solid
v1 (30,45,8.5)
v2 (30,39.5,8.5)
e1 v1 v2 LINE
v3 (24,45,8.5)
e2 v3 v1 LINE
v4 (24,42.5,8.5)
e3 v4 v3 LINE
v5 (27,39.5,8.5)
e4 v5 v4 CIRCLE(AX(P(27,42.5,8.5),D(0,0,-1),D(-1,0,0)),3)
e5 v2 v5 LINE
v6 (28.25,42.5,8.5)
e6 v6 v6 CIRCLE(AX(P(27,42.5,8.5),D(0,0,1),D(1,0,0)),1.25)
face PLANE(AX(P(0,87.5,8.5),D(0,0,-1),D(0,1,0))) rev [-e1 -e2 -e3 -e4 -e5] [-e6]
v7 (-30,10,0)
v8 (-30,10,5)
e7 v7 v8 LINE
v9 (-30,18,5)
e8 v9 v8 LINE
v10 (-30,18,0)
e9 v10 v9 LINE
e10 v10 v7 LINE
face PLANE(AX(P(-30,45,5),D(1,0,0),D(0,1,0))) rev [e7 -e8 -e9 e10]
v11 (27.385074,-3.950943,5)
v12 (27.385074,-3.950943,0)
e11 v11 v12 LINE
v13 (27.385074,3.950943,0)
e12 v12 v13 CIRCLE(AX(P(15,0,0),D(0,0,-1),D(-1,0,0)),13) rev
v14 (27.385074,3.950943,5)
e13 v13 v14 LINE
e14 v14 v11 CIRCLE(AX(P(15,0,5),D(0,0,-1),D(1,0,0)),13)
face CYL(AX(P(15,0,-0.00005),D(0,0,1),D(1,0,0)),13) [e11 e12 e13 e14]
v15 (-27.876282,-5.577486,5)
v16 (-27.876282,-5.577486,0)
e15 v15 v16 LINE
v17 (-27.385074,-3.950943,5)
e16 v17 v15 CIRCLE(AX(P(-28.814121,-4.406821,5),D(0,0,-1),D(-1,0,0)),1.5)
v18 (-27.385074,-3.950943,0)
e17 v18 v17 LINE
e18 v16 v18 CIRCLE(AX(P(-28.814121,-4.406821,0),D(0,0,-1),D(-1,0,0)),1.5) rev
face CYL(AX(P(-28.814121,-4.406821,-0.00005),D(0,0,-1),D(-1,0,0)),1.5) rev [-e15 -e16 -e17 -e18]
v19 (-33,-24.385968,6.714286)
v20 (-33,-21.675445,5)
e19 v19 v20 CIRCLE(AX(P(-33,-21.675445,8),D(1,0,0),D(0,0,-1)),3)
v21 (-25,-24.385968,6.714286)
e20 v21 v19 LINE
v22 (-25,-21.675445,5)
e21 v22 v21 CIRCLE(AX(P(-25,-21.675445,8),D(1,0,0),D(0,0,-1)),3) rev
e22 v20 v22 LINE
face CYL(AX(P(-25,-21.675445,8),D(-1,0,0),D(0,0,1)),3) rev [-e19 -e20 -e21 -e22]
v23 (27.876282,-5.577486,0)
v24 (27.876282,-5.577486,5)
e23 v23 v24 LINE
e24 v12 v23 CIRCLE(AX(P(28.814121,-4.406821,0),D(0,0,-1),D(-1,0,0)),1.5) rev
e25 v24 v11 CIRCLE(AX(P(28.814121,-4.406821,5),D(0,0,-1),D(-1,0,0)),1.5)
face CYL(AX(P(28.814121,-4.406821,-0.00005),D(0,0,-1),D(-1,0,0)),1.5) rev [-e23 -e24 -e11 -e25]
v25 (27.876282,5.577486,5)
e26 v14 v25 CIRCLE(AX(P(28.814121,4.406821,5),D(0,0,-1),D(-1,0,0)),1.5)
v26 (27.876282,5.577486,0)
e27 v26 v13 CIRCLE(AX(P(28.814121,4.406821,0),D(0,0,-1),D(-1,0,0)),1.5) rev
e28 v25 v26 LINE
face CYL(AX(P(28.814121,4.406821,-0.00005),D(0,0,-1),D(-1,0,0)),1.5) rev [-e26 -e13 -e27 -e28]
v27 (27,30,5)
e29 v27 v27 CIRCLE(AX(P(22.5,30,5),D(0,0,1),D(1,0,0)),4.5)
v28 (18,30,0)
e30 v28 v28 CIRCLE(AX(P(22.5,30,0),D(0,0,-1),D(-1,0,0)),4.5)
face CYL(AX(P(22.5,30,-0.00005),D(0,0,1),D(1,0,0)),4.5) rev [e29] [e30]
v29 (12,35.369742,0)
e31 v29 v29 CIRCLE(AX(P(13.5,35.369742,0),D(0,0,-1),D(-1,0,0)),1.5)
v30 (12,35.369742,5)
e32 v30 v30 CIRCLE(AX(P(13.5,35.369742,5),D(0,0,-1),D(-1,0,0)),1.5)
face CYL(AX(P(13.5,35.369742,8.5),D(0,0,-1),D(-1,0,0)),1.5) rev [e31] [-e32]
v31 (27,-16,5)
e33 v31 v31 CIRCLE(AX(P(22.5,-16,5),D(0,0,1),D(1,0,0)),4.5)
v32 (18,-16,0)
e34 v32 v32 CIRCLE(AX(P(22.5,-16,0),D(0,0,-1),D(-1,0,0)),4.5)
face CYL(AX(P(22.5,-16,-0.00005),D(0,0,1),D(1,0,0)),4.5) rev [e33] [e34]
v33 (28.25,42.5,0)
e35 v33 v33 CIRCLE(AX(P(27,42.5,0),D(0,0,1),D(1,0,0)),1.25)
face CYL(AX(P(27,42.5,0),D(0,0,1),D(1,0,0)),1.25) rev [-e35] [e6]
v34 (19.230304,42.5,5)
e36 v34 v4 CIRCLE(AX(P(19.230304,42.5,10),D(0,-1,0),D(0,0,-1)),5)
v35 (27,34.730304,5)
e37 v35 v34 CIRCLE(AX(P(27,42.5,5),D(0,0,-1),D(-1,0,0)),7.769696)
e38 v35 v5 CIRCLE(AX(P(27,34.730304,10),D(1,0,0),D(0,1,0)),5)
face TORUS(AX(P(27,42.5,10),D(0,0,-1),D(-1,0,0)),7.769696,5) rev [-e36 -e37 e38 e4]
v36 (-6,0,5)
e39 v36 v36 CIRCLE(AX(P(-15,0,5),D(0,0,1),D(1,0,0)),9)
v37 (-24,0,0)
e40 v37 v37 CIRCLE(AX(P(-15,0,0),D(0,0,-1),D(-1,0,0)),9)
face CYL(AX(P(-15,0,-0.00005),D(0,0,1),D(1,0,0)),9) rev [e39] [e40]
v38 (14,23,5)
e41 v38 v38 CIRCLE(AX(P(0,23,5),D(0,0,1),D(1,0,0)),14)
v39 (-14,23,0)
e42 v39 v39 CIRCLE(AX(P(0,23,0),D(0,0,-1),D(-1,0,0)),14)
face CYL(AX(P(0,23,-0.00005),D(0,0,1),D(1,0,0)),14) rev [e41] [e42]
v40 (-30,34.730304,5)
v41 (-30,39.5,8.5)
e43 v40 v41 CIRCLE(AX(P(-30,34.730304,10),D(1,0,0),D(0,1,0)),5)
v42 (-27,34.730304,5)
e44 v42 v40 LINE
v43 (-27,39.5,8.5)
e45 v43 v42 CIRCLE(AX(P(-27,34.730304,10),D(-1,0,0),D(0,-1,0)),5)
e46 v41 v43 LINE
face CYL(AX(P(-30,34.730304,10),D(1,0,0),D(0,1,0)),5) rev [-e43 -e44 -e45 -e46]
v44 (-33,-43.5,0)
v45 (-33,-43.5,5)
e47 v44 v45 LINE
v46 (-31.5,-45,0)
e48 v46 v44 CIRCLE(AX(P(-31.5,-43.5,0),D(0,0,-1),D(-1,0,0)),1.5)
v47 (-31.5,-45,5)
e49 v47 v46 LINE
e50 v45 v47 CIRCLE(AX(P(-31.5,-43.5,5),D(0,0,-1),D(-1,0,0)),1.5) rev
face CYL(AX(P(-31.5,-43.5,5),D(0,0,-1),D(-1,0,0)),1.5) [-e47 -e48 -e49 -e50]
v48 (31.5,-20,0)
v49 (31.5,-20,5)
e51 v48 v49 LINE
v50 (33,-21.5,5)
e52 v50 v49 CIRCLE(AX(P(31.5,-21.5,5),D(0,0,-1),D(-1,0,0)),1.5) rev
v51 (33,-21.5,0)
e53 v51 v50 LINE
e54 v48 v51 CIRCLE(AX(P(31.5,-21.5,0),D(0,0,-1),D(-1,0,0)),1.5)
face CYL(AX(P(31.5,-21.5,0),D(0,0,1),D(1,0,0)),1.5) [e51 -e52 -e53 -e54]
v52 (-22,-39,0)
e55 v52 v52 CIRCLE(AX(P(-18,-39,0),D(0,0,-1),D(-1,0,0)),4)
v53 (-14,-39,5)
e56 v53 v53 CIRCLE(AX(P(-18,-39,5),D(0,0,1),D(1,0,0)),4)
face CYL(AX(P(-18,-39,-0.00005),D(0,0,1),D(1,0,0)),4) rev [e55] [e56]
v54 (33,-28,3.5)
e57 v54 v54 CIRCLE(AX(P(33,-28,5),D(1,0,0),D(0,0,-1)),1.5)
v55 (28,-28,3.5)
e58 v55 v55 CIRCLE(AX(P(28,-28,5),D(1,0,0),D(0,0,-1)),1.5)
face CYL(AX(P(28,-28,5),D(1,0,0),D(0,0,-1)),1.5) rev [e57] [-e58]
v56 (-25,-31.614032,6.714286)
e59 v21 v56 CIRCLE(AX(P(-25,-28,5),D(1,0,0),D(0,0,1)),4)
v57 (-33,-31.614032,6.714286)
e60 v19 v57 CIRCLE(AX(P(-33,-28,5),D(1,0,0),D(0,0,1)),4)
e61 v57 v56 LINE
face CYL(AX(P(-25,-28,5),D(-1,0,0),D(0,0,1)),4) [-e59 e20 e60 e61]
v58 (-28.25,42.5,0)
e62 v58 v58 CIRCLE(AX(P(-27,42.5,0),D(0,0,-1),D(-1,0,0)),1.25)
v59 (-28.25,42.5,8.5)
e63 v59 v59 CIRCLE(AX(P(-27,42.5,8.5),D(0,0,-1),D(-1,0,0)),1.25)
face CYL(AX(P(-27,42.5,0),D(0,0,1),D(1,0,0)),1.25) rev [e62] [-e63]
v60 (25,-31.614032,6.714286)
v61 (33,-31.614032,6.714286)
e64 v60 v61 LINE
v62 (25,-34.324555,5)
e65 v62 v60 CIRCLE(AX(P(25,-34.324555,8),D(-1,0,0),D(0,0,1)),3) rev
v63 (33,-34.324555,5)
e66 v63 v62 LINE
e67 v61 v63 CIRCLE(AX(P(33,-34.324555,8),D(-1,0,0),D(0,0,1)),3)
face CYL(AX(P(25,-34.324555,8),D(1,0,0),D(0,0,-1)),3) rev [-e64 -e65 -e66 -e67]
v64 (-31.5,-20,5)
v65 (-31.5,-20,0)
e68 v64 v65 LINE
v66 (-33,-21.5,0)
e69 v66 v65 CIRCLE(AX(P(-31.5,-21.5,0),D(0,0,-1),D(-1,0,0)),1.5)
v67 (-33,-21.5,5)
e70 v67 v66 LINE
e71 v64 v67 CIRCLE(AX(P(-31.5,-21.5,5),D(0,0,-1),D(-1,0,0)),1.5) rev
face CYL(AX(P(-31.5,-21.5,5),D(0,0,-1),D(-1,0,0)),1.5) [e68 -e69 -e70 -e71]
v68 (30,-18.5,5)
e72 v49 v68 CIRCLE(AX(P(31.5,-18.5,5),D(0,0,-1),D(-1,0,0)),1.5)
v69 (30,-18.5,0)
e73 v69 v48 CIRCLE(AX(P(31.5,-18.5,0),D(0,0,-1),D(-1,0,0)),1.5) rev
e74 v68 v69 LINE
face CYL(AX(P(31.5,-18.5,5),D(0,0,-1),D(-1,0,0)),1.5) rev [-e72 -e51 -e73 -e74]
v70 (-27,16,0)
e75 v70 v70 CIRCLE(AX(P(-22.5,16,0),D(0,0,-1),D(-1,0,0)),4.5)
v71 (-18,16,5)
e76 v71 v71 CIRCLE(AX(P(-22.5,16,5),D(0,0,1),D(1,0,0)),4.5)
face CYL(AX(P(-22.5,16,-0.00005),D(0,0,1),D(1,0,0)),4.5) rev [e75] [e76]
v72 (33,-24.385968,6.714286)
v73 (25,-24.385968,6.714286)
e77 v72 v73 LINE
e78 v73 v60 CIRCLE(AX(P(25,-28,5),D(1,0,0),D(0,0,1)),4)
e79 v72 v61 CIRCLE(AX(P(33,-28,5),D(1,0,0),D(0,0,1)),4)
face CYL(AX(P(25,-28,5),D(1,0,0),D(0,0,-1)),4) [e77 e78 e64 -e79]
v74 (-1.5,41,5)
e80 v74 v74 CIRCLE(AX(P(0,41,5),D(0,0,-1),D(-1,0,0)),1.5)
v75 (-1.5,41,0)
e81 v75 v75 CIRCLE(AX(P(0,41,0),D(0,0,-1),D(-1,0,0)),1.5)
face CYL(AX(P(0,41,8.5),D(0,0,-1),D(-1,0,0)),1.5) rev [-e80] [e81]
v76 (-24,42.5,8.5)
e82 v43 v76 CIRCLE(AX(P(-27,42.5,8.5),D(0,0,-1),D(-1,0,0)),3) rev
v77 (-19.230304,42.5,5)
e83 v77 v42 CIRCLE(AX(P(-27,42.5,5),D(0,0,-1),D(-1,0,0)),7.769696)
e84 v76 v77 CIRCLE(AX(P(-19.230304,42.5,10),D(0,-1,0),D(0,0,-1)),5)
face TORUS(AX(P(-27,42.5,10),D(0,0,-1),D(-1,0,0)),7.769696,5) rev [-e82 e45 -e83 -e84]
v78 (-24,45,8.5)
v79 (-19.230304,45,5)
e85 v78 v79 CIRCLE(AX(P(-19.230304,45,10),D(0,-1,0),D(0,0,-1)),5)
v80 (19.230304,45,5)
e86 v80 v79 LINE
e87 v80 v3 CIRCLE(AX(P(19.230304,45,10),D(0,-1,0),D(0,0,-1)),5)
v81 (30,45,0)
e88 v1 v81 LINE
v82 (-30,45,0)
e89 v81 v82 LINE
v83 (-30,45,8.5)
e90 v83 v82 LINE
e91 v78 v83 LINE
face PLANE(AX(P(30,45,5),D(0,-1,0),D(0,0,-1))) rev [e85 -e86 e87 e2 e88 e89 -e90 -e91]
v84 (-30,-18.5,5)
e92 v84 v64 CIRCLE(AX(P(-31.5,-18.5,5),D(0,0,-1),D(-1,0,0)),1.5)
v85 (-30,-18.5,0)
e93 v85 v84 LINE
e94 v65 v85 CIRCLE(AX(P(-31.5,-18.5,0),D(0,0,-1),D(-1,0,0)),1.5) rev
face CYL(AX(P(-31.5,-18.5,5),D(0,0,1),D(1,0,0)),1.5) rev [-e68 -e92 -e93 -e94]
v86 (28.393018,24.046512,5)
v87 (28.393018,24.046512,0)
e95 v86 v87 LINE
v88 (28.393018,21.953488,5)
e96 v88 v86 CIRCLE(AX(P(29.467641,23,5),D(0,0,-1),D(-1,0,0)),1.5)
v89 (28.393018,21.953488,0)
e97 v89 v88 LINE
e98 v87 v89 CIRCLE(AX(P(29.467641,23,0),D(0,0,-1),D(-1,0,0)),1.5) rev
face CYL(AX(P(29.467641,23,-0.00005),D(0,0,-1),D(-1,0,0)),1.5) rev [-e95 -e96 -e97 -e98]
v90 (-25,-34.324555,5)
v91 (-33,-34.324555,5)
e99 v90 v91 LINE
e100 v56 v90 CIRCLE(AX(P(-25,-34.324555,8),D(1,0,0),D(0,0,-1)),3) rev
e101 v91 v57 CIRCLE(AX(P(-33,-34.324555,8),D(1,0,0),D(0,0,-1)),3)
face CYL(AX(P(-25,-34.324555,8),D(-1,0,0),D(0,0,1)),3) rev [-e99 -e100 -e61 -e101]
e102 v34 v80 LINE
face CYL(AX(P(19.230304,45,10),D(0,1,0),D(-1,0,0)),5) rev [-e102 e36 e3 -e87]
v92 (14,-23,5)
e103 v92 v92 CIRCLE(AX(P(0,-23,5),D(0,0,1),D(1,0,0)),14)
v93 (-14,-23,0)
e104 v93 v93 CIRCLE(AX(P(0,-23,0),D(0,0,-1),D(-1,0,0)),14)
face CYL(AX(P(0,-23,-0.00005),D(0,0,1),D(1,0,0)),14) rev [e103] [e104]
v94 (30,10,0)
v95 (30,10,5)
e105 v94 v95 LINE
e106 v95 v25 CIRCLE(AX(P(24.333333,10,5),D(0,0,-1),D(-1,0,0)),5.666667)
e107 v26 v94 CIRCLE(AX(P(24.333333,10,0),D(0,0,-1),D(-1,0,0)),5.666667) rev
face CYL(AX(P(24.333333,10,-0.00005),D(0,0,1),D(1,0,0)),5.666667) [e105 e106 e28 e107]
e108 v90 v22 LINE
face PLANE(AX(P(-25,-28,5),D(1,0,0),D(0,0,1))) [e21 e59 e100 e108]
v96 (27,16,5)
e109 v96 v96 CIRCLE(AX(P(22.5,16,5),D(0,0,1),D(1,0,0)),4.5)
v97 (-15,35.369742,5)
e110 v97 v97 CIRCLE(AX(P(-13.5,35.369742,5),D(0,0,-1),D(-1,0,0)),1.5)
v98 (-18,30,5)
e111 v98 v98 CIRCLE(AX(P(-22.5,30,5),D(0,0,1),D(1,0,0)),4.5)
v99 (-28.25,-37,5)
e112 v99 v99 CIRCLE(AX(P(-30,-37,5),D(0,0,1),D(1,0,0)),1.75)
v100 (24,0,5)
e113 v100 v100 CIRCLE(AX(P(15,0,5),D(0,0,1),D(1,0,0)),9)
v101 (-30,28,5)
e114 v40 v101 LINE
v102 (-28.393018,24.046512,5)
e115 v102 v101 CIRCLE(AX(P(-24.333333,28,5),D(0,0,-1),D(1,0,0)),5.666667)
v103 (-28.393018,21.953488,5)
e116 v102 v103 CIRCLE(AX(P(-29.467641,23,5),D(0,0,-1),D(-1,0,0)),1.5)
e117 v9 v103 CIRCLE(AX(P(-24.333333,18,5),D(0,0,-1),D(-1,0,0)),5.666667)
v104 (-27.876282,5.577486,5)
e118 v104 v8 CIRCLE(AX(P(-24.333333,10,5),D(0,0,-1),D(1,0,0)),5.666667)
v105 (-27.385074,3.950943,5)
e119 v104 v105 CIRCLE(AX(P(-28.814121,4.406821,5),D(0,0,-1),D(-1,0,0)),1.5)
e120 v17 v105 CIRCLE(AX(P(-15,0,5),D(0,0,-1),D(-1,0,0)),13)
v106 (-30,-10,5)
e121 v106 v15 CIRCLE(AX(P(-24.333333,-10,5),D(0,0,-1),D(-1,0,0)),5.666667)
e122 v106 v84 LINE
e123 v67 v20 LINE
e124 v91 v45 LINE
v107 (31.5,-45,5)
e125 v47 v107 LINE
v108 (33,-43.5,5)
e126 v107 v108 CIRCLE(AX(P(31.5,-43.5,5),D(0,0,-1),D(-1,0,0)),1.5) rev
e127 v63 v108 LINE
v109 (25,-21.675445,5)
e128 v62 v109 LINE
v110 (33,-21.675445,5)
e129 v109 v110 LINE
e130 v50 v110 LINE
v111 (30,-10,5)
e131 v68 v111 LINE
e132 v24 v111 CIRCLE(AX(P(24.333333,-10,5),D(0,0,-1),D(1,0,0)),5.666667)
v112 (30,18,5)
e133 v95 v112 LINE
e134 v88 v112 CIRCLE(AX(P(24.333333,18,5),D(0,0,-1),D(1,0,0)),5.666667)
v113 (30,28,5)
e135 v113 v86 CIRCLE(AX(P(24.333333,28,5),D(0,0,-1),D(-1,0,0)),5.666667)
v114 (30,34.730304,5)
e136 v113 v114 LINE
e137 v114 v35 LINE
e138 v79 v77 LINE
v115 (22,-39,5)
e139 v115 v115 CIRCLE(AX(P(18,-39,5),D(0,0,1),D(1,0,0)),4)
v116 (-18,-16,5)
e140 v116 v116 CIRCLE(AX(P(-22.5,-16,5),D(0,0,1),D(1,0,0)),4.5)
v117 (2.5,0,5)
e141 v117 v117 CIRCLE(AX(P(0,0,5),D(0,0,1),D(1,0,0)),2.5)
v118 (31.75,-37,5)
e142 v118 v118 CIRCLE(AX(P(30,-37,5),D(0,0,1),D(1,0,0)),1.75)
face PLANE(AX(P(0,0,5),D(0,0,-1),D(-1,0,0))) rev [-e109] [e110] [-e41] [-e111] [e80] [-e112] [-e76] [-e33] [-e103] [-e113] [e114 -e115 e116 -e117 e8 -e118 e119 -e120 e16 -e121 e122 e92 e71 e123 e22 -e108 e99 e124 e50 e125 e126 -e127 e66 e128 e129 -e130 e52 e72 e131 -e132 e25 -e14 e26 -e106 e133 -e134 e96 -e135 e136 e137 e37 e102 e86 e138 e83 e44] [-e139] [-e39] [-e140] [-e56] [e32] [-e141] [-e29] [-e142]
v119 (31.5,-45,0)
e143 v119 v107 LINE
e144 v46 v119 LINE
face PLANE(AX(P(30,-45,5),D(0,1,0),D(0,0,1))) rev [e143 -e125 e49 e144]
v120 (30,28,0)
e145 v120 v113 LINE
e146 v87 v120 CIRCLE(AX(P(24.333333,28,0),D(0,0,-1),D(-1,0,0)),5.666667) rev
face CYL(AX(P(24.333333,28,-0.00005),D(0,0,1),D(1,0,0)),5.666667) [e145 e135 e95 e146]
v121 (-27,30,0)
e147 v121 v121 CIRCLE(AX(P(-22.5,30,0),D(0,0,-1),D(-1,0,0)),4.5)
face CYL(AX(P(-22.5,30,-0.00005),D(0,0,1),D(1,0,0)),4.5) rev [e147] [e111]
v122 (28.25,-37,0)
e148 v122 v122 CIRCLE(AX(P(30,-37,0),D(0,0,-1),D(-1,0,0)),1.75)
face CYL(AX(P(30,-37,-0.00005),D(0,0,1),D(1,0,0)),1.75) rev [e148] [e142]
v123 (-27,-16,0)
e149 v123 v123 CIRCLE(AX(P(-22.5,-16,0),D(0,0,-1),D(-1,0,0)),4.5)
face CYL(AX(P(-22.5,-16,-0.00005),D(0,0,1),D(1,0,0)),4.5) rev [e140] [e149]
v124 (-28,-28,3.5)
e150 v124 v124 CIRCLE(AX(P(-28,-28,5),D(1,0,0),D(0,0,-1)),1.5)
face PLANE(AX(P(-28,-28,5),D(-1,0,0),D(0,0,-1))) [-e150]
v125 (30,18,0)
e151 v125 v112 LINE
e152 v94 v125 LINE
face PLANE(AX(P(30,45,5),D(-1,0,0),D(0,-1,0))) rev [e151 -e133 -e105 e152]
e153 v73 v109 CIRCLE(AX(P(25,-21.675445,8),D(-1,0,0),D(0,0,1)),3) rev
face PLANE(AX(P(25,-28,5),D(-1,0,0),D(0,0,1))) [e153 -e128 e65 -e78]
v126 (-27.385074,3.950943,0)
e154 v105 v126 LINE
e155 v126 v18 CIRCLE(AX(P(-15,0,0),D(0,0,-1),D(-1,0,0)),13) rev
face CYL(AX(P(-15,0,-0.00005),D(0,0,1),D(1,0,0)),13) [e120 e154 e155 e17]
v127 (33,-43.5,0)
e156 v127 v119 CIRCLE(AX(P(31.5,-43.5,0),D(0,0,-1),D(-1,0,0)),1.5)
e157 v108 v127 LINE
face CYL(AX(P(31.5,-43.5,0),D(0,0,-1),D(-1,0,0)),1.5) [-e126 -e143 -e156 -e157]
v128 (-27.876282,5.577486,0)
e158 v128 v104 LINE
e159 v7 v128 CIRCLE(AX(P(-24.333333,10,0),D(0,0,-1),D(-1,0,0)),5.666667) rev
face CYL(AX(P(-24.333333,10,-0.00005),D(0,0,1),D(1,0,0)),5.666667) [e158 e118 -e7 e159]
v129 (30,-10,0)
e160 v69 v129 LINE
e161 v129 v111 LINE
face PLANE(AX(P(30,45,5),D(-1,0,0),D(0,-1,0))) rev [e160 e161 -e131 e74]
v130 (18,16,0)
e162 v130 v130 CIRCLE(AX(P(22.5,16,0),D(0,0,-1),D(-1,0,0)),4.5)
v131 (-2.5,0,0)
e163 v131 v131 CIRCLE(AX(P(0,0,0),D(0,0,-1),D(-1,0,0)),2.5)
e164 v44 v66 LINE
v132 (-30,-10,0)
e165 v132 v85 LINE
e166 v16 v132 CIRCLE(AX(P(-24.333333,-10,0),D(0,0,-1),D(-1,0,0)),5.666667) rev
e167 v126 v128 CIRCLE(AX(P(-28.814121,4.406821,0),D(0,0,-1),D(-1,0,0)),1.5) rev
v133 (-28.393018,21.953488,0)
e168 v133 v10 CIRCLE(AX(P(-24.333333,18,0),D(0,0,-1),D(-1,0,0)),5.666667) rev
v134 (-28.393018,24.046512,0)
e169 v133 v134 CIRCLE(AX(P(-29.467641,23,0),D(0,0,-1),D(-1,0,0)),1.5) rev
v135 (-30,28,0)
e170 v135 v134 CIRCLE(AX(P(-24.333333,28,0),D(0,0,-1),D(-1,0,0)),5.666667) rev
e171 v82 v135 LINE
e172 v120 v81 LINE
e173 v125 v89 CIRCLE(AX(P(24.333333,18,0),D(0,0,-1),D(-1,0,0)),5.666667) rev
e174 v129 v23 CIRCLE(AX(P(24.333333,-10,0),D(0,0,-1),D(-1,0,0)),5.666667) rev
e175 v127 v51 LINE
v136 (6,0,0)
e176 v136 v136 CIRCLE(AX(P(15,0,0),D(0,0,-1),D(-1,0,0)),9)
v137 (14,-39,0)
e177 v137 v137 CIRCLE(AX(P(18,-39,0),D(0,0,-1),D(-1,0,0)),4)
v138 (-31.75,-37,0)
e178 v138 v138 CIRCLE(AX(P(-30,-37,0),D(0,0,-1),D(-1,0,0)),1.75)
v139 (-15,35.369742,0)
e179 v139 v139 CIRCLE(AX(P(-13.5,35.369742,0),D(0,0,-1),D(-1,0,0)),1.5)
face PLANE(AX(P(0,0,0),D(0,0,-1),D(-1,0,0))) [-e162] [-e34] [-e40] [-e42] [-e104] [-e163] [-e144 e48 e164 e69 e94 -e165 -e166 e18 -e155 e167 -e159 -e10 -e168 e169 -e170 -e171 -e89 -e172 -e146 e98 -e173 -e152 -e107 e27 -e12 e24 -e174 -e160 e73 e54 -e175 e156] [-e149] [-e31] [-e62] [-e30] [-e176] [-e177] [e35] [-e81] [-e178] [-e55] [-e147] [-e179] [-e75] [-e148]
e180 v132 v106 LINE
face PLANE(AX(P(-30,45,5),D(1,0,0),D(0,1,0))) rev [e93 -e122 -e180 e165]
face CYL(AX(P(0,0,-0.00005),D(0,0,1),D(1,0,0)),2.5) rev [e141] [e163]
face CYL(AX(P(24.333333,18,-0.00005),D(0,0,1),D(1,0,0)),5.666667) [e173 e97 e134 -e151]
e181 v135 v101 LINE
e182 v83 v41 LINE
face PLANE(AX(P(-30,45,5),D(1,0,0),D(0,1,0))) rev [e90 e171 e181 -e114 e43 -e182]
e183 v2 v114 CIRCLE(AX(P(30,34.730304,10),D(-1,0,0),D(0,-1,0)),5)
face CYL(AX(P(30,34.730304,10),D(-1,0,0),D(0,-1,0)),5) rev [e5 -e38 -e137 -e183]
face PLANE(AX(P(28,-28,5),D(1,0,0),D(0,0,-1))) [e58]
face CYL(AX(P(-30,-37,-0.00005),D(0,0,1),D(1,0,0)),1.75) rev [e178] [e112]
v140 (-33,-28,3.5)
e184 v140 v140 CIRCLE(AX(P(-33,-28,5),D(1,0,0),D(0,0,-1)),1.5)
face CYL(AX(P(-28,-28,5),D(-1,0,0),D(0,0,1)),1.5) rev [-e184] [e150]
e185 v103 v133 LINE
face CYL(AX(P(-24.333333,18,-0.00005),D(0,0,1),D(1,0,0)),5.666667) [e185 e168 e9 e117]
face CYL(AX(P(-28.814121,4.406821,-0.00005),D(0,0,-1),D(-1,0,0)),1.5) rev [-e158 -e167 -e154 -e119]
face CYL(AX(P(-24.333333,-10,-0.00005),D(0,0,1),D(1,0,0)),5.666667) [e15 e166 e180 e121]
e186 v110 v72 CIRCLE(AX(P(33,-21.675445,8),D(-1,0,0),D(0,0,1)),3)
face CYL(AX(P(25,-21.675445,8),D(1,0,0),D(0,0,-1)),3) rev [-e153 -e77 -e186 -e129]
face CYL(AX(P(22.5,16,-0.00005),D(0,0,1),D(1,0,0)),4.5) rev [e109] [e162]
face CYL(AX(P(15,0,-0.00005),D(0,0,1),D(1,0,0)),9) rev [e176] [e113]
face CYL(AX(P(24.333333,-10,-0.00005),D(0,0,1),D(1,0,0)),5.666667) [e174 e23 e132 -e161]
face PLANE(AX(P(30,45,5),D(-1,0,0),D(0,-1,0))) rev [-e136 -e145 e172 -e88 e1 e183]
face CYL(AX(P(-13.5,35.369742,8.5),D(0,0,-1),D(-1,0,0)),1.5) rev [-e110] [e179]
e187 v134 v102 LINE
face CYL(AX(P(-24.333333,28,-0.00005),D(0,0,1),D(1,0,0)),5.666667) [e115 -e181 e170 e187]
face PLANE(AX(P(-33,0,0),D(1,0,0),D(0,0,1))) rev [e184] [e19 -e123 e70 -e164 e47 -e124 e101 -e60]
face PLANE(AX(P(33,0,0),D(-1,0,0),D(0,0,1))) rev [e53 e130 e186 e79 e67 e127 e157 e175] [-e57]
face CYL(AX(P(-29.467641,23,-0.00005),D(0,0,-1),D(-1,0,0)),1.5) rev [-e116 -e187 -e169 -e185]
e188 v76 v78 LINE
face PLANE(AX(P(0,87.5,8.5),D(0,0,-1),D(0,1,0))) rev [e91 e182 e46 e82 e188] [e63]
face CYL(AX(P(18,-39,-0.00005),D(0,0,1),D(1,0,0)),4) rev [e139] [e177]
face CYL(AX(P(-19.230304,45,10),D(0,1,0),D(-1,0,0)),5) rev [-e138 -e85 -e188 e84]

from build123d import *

# Parameters (mm, degrees)
SKETCH1_W            = 60
SKETCH1_H            = 90
BOSS_EXTRUDE1_DEPTH  = 5
SKETCH2_W            = 5
SKETCH2_H            = 25
BOSS_EXTRUDE2_DEPTH  = 3
SKETCH3_R            = 14
SKETCH3_R_2          = 9
SKETCH3_R_3          = 4.5
SKETCH3_R_4          = 4
SKETCH3_R_5          = 2.5
CUT_EXTRUDE1_DEPTH   = 57.026779311
SKETCH4_R            = 1.75
CUT_EXTRUDE2_DEPTH   = 57.026779311
FILLET1_R            = 1.5
FILLET2_R            = 1.5
BOSS_EXTRUDE3_DEPTH  = 3.5
SKETCH6_R            = 1.25
CUT_EXTRUDE3_DEPTH   = 57.446877835
FILLET3_R            = 5
FILLET3_OF_MIRROR2_R = 5
SKETCH12_R           = 1.5
CUT_EXTRUDE7_DEPTH   = 57.44687782
BOSS_EXTRUDE5_DEPTH  = 8
FILLET5_R            = 3
SKETCH15_R           = 1.5
CUT_EXTRUDE8_DEPTH   = 5
FILLET5_OF_MIRROR3_R = 3


# Some blends are built 0.0001 mm under size
with BuildPart() as part:
    # Sketch1 → Boss-Extrude1 (new body)
    with BuildSketch(Plane.XY):
        Rectangle(SKETCH1_W, SKETCH1_H)
    extrude(amount=BOSS_EXTRUDE1_DEPTH)

    # Sketch2 → Boss-Extrude2 (add)
    with BuildSketch(Plane(origin=(30, 0, 0), x_dir=(0, 0, -1), z_dir=(1, 0, 0))):
        with Locations((-2.5, -32.5)):
            Rectangle(SKETCH2_W, SKETCH2_H)
    boss_extrude2 = extrude(amount=BOSS_EXTRUDE2_DEPTH)

    # Mirror1: Boss-Extrude2 across plane
    add(boss_extrude2.mirror(Plane(origin=(0, 0, 0), x_dir=(0, 0, 1), z_dir=(1, 0, 0))))

    # Sketch3 → Cut-Extrude1 (cut, through all)
    with BuildSketch(Plane.XY.offset(5)):
        with Locations((0, -23)):
            Circle(SKETCH3_R)
        with Locations((0, 23)):
            Circle(SKETCH3_R)
        with Locations((15, 0)):
            Circle(SKETCH3_R_2)
        with Locations((-15, 0)):
            Circle(SKETCH3_R_2)
        with Locations((-22.5, -16)):
            Circle(SKETCH3_R_3)
        with Locations((-18, -39)):
            Circle(SKETCH3_R_4)
        with Locations((22.5, -16)):
            Circle(SKETCH3_R_3)
        with Locations((18, -39)):
            Circle(SKETCH3_R_4)
        with Locations((22.5, 16)):
            Circle(SKETCH3_R_3)
        with Locations((22.5, 30)):
            Circle(SKETCH3_R_3)
        with Locations((-22.5, 30)):
            Circle(SKETCH3_R_3)
        with Locations((-22.5, 16)):
            Circle(SKETCH3_R_3)
        Circle(SKETCH3_R_5)
        with BuildLine():
            Line((30, -10), (30, 10))
            ThreePointArc((30, 10), (29.192459912, 7.084524053), (27, 5))
            ThreePointArc((27, 5), (28, 0), (27, -5))
            ThreePointArc((27, -5), (29.192459912, -7.084524053), (30, -10))
        make_face()
        with BuildLine():
            Line((30, 18), (30, 28))
            ThreePointArc((30, 28), (29.192459912, 25.084524053), (27, 23))
            ThreePointArc((27, 23), (29.192459912, 20.915475947), (30, 18))
        make_face()
        with BuildLine():
            Line((-30, 18), (-30, 28))
            ThreePointArc((-30, 28), (-29.192459912, 25.084524053), (-27, 23))
            ThreePointArc((-27, 23), (-29.192459912, 20.915475947), (-30, 18))
        make_face()
        with BuildLine():
            Line((-30, -10), (-30, 10))
            ThreePointArc((-30, 10), (-29.192459912, 7.084524053), (-27, 5))
            ThreePointArc((-27, 5), (-28, 0), (-27, -5))
            ThreePointArc((-27, -5), (-29.192459912, -7.084524053), (-30, -10))
        make_face()
    extrude(amount=-CUT_EXTRUDE1_DEPTH, mode=Mode.SUBTRACT)

    # Sketch4 → Cut-Extrude2 (cut, through all)
    with BuildSketch(Plane.XY.offset(5)):
        with Locations((-30, -37)):
            Circle(SKETCH4_R)
        with Locations((30, -37)):
            Circle(SKETCH4_R)
    extrude(amount=-CUT_EXTRUDE2_DEPTH, mode=Mode.SUBTRACT)

    # Fillet1
    fillet1_edges = [part.edges().sort_by_distance(p)[0] for p in [
        (-33, -20, 2.5),
        (-33, -45, 2.5),
        (-30, -20, 2.5),
        (33, -45, 2.5),
        (33, -20, 2.5),
        (30, -20, 2.5),
    ]]
    fillet(fillet1_edges, radius=FILLET1_R - 0.0001)  # a hair under: the kernel refuses the full size

    # Fillet2
    fillet2_edges = [part.edges().sort_by_distance(p)[0] for p in [
        (27, -5, 2.5),
        (27, 5, 2.5),
        (27, 23, 2.5),
        (-27, 23, 2.5),
        (-27, -5, 2.5),
        (-27, 5, 2.5),
    ]]
    fillet(fillet2_edges, radius=FILLET2_R)

    # Sketch5 → Boss-Extrude3 (add)
    with BuildSketch(Plane.XY.offset(5)):
        with BuildLine():
            Line((24, 45), (30, 45))
            Line((30, 45), (30, 39.5))
            Line((30, 39.5), (27, 39.5))
            ThreePointArc((27, 39.5), (24.878679656, 40.378679656), (24, 42.5))
            Line((24, 42.5), (24, 45))
        make_face()
    boss_extrude3 = extrude(amount=BOSS_EXTRUDE3_DEPTH)

    # Sketch6 → Cut-Extrude3 (cut, through all)
    with BuildSketch(Plane.XY.offset(8.5)):
        with Locations((27, 42.5)):
            Circle(SKETCH6_R)
    cut_extrude3 = extrude(amount=-CUT_EXTRUDE3_DEPTH, mode=Mode.SUBTRACT)

    # Fillet3
    # the kernel refuses this fillet: 5 mm, written as the material it adds along each edge
    with BuildSketch(Plane(origin=(24, 42.5, 5), x_dir=(-1, 0, 0), z_dir=(0, 1, 0))) as fillet3_piece_1:
        with BuildLine():
            CenterArc((4.769696007, 5), FILLET3_R, 197.457603124, 72.542396876)
            Line((0, 3.5), (-0.09539392, 3.47))
            ThreePointArc((-0.09539392, 3.47), (-0.1, 1.75), (-0.1, 0))
            Line((-0.1, 0), (0, -0.1))
            Line((0, -0.1), (4.769696007, -0.1))
            Line((4.769696007, -0.1), (4.769696007, 0))
        make_face()
    extrude(amount=2.5)
    with BuildSketch(Plane(origin=(27, 42.5, 5), x_dir=(0, -1, 0), z_dir=(1, 0, 0))) as fillet3_piece_2:
        with BuildLine():
            CenterArc((7.769696007, -5), FILLET3_R, 90, 72.542396876)
            Line((3, -3.5), (2.90460608, -3.47))
            ThreePointArc((2.90460608, -3.47), (2.9, -1.75), (2.9, 0))
            Line((2.9, 0), (3, 0.1))
            Line((3, 0.1), (7.769696007, 0.1))
            Line((7.769696007, 0.1), (7.769696007, 0))
        make_face()
    revolve(axis=Axis((27, 42.5, 5), (0, 0, -1)), revolution_arc=90)
    with BuildSketch(Plane(origin=(30, 39.5, 5), x_dir=(0, -1, 0), z_dir=(-1, 0, 0))) as fillet3_piece_3:
        with BuildLine():
            CenterArc((4.769696007, 5), FILLET3_R, 197.457603124, 72.542396876)
            Line((0, 3.5), (-0.09539392, 3.47))
            ThreePointArc((-0.09539392, 3.47), (-0.1, 1.75), (-0.1, 0))
            Line((-0.1, 0), (0, -0.1))
            Line((0, -0.1), (4.769696007, -0.1))
            Line((4.769696007, -0.1), (4.769696007, 0))
        make_face()
    extrude(amount=3)

    # Mirror2: Boss-Extrude3, Cut-Extrude3 across plane
    add(boss_extrude3.mirror(Plane(origin=(0, 0, 0), x_dir=(0, 0, 1), z_dir=(1, 0, 0))))
    add(cut_extrude3.mirror(Plane(origin=(0, 0, 0), x_dir=(0, 0, 1), z_dir=(1, 0, 0))), mode=Mode.SUBTRACT)

    # Fillet3 of Mirror2
    # the kernel refuses this fillet: 5 mm, written as the material it adds along each edge
    with BuildSketch(Plane(origin=(-24, 42.5, 5), x_dir=(1, 0, 0), z_dir=(0, 1, 0))) as fillet3_of_mirror2_piece_1:
        with BuildLine():
            CenterArc((4.769696007, -5), FILLET3_OF_MIRROR2_R, 90, 72.542396876)
            Line((0, -3.5), (-0.09539392, -3.47))
            ThreePointArc((-0.09539392, -3.47), (-0.1, -1.75), (-0.1, 0))
            Line((-0.1, 0), (0, 0.1))
            Line((0, 0.1), (4.769696007, 0.1))
            Line((4.769696007, 0.1), (4.769696007, 0))
        make_face()
    extrude(amount=2.5)
    with BuildSketch(Plane(origin=(-27, 42.5, 5), x_dir=(0, -1, 0), z_dir=(-1, 0, 0))) as fillet3_of_mirror2_piece_2:
        with BuildLine():
            CenterArc((7.769696007, 5), FILLET3_OF_MIRROR2_R, 197.457603124, 72.542396876)
            Line((3, 3.5), (2.90460608, 3.47))
            ThreePointArc((2.90460608, 3.47), (2.9, 1.75), (2.9, 0))
            Line((2.9, 0), (3, -0.1))
            Line((3, -0.1), (7.769696007, -0.1))
            Line((7.769696007, -0.1), (7.769696007, 0))
        make_face()
    revolve(axis=Axis((-27, 42.5, 5), (0, 0, 1)), revolution_arc=90)
    with BuildSketch(Plane(origin=(-30, 39.5, 5), x_dir=(0, -1, 0), z_dir=(1, 0, 0))) as fillet3_of_mirror2_piece_3:
        with BuildLine():
            CenterArc((4.769696007, -5), FILLET3_OF_MIRROR2_R, 90, 72.542396876)
            Line((0, -3.5), (-0.09539392, -3.47))
            ThreePointArc((-0.09539392, -3.47), (-0.1, -1.75), (-0.1, 0))
            Line((-0.1, 0), (0, 0.1))
            Line((0, 0.1), (4.769696007, 0.1))
            Line((4.769696007, 0.1), (4.769696007, 0))
        make_face()
    extrude(amount=3)

    # Sketch12 → Cut-Extrude7 (cut, through all)
    with BuildSketch(Plane(origin=(0, 0, 0), x_dir=(-1, 0, 0), z_dir=(0, 0, -1))):
        with Locations((-13.5, 35.369741957)):
            Circle(SKETCH12_R)
        with Locations((0, 41)):
            Circle(SKETCH12_R)
        with Locations((13.5, 35.369741957)):
            Circle(SKETCH12_R)
    extrude(amount=-CUT_EXTRUDE7_DEPTH, mode=Mode.SUBTRACT)

    # Sketch14 → Boss-Extrude5 (add)
    with BuildSketch(Plane(origin=(33, 0, 0), x_dir=(0, 0, -1), z_dir=(1, 0, 0))):
        with BuildLine():
            Line((-5, -24), (-5, -32))
            ThreePointArc((-5, -32), (-9, -28), (-5, -24))
        make_face()
    boss_extrude5 = extrude(amount=-BOSS_EXTRUDE5_DEPTH)

    # Fillet5
    fillet5_edges = [part.edges().sort_by_distance(p)[0] for p in [
        (29, -32, 5),
        (29, -24, 5),
    ]]
    fillet(fillet5_edges, radius=FILLET5_R)

    # Sketch15 → Cut-Extrude8 (cut)
    with BuildSketch(Plane(origin=(33, 0, 0), x_dir=(0, 0, -1), z_dir=(1, 0, 0))):
        with Locations((-5, -28)):
            Circle(SKETCH15_R)
    cut_extrude8 = extrude(amount=-CUT_EXTRUDE8_DEPTH, mode=Mode.SUBTRACT)

    # Mirror3: Boss-Extrude5, Cut-Extrude8 across plane
    add(boss_extrude5.mirror(Plane(origin=(0, 0, 0), x_dir=(0, 0, 1), z_dir=(1, 0, 0))))
    add(cut_extrude8.mirror(Plane(origin=(0, 0, 0), x_dir=(0, 0, 1), z_dir=(1, 0, 0))), mode=Mode.SUBTRACT)

    # Fillet5 of Mirror3
    fillet5_of_mirror3_edges = [part.edges().sort_by_distance(p)[0] for p in [
        (-29, -32, 5),
        (-29, -24, 5),
    ]]
    fillet(fillet5_of_mirror3_edges, radius=FILLET5_OF_MIRROR3_R)


solid = part.part
